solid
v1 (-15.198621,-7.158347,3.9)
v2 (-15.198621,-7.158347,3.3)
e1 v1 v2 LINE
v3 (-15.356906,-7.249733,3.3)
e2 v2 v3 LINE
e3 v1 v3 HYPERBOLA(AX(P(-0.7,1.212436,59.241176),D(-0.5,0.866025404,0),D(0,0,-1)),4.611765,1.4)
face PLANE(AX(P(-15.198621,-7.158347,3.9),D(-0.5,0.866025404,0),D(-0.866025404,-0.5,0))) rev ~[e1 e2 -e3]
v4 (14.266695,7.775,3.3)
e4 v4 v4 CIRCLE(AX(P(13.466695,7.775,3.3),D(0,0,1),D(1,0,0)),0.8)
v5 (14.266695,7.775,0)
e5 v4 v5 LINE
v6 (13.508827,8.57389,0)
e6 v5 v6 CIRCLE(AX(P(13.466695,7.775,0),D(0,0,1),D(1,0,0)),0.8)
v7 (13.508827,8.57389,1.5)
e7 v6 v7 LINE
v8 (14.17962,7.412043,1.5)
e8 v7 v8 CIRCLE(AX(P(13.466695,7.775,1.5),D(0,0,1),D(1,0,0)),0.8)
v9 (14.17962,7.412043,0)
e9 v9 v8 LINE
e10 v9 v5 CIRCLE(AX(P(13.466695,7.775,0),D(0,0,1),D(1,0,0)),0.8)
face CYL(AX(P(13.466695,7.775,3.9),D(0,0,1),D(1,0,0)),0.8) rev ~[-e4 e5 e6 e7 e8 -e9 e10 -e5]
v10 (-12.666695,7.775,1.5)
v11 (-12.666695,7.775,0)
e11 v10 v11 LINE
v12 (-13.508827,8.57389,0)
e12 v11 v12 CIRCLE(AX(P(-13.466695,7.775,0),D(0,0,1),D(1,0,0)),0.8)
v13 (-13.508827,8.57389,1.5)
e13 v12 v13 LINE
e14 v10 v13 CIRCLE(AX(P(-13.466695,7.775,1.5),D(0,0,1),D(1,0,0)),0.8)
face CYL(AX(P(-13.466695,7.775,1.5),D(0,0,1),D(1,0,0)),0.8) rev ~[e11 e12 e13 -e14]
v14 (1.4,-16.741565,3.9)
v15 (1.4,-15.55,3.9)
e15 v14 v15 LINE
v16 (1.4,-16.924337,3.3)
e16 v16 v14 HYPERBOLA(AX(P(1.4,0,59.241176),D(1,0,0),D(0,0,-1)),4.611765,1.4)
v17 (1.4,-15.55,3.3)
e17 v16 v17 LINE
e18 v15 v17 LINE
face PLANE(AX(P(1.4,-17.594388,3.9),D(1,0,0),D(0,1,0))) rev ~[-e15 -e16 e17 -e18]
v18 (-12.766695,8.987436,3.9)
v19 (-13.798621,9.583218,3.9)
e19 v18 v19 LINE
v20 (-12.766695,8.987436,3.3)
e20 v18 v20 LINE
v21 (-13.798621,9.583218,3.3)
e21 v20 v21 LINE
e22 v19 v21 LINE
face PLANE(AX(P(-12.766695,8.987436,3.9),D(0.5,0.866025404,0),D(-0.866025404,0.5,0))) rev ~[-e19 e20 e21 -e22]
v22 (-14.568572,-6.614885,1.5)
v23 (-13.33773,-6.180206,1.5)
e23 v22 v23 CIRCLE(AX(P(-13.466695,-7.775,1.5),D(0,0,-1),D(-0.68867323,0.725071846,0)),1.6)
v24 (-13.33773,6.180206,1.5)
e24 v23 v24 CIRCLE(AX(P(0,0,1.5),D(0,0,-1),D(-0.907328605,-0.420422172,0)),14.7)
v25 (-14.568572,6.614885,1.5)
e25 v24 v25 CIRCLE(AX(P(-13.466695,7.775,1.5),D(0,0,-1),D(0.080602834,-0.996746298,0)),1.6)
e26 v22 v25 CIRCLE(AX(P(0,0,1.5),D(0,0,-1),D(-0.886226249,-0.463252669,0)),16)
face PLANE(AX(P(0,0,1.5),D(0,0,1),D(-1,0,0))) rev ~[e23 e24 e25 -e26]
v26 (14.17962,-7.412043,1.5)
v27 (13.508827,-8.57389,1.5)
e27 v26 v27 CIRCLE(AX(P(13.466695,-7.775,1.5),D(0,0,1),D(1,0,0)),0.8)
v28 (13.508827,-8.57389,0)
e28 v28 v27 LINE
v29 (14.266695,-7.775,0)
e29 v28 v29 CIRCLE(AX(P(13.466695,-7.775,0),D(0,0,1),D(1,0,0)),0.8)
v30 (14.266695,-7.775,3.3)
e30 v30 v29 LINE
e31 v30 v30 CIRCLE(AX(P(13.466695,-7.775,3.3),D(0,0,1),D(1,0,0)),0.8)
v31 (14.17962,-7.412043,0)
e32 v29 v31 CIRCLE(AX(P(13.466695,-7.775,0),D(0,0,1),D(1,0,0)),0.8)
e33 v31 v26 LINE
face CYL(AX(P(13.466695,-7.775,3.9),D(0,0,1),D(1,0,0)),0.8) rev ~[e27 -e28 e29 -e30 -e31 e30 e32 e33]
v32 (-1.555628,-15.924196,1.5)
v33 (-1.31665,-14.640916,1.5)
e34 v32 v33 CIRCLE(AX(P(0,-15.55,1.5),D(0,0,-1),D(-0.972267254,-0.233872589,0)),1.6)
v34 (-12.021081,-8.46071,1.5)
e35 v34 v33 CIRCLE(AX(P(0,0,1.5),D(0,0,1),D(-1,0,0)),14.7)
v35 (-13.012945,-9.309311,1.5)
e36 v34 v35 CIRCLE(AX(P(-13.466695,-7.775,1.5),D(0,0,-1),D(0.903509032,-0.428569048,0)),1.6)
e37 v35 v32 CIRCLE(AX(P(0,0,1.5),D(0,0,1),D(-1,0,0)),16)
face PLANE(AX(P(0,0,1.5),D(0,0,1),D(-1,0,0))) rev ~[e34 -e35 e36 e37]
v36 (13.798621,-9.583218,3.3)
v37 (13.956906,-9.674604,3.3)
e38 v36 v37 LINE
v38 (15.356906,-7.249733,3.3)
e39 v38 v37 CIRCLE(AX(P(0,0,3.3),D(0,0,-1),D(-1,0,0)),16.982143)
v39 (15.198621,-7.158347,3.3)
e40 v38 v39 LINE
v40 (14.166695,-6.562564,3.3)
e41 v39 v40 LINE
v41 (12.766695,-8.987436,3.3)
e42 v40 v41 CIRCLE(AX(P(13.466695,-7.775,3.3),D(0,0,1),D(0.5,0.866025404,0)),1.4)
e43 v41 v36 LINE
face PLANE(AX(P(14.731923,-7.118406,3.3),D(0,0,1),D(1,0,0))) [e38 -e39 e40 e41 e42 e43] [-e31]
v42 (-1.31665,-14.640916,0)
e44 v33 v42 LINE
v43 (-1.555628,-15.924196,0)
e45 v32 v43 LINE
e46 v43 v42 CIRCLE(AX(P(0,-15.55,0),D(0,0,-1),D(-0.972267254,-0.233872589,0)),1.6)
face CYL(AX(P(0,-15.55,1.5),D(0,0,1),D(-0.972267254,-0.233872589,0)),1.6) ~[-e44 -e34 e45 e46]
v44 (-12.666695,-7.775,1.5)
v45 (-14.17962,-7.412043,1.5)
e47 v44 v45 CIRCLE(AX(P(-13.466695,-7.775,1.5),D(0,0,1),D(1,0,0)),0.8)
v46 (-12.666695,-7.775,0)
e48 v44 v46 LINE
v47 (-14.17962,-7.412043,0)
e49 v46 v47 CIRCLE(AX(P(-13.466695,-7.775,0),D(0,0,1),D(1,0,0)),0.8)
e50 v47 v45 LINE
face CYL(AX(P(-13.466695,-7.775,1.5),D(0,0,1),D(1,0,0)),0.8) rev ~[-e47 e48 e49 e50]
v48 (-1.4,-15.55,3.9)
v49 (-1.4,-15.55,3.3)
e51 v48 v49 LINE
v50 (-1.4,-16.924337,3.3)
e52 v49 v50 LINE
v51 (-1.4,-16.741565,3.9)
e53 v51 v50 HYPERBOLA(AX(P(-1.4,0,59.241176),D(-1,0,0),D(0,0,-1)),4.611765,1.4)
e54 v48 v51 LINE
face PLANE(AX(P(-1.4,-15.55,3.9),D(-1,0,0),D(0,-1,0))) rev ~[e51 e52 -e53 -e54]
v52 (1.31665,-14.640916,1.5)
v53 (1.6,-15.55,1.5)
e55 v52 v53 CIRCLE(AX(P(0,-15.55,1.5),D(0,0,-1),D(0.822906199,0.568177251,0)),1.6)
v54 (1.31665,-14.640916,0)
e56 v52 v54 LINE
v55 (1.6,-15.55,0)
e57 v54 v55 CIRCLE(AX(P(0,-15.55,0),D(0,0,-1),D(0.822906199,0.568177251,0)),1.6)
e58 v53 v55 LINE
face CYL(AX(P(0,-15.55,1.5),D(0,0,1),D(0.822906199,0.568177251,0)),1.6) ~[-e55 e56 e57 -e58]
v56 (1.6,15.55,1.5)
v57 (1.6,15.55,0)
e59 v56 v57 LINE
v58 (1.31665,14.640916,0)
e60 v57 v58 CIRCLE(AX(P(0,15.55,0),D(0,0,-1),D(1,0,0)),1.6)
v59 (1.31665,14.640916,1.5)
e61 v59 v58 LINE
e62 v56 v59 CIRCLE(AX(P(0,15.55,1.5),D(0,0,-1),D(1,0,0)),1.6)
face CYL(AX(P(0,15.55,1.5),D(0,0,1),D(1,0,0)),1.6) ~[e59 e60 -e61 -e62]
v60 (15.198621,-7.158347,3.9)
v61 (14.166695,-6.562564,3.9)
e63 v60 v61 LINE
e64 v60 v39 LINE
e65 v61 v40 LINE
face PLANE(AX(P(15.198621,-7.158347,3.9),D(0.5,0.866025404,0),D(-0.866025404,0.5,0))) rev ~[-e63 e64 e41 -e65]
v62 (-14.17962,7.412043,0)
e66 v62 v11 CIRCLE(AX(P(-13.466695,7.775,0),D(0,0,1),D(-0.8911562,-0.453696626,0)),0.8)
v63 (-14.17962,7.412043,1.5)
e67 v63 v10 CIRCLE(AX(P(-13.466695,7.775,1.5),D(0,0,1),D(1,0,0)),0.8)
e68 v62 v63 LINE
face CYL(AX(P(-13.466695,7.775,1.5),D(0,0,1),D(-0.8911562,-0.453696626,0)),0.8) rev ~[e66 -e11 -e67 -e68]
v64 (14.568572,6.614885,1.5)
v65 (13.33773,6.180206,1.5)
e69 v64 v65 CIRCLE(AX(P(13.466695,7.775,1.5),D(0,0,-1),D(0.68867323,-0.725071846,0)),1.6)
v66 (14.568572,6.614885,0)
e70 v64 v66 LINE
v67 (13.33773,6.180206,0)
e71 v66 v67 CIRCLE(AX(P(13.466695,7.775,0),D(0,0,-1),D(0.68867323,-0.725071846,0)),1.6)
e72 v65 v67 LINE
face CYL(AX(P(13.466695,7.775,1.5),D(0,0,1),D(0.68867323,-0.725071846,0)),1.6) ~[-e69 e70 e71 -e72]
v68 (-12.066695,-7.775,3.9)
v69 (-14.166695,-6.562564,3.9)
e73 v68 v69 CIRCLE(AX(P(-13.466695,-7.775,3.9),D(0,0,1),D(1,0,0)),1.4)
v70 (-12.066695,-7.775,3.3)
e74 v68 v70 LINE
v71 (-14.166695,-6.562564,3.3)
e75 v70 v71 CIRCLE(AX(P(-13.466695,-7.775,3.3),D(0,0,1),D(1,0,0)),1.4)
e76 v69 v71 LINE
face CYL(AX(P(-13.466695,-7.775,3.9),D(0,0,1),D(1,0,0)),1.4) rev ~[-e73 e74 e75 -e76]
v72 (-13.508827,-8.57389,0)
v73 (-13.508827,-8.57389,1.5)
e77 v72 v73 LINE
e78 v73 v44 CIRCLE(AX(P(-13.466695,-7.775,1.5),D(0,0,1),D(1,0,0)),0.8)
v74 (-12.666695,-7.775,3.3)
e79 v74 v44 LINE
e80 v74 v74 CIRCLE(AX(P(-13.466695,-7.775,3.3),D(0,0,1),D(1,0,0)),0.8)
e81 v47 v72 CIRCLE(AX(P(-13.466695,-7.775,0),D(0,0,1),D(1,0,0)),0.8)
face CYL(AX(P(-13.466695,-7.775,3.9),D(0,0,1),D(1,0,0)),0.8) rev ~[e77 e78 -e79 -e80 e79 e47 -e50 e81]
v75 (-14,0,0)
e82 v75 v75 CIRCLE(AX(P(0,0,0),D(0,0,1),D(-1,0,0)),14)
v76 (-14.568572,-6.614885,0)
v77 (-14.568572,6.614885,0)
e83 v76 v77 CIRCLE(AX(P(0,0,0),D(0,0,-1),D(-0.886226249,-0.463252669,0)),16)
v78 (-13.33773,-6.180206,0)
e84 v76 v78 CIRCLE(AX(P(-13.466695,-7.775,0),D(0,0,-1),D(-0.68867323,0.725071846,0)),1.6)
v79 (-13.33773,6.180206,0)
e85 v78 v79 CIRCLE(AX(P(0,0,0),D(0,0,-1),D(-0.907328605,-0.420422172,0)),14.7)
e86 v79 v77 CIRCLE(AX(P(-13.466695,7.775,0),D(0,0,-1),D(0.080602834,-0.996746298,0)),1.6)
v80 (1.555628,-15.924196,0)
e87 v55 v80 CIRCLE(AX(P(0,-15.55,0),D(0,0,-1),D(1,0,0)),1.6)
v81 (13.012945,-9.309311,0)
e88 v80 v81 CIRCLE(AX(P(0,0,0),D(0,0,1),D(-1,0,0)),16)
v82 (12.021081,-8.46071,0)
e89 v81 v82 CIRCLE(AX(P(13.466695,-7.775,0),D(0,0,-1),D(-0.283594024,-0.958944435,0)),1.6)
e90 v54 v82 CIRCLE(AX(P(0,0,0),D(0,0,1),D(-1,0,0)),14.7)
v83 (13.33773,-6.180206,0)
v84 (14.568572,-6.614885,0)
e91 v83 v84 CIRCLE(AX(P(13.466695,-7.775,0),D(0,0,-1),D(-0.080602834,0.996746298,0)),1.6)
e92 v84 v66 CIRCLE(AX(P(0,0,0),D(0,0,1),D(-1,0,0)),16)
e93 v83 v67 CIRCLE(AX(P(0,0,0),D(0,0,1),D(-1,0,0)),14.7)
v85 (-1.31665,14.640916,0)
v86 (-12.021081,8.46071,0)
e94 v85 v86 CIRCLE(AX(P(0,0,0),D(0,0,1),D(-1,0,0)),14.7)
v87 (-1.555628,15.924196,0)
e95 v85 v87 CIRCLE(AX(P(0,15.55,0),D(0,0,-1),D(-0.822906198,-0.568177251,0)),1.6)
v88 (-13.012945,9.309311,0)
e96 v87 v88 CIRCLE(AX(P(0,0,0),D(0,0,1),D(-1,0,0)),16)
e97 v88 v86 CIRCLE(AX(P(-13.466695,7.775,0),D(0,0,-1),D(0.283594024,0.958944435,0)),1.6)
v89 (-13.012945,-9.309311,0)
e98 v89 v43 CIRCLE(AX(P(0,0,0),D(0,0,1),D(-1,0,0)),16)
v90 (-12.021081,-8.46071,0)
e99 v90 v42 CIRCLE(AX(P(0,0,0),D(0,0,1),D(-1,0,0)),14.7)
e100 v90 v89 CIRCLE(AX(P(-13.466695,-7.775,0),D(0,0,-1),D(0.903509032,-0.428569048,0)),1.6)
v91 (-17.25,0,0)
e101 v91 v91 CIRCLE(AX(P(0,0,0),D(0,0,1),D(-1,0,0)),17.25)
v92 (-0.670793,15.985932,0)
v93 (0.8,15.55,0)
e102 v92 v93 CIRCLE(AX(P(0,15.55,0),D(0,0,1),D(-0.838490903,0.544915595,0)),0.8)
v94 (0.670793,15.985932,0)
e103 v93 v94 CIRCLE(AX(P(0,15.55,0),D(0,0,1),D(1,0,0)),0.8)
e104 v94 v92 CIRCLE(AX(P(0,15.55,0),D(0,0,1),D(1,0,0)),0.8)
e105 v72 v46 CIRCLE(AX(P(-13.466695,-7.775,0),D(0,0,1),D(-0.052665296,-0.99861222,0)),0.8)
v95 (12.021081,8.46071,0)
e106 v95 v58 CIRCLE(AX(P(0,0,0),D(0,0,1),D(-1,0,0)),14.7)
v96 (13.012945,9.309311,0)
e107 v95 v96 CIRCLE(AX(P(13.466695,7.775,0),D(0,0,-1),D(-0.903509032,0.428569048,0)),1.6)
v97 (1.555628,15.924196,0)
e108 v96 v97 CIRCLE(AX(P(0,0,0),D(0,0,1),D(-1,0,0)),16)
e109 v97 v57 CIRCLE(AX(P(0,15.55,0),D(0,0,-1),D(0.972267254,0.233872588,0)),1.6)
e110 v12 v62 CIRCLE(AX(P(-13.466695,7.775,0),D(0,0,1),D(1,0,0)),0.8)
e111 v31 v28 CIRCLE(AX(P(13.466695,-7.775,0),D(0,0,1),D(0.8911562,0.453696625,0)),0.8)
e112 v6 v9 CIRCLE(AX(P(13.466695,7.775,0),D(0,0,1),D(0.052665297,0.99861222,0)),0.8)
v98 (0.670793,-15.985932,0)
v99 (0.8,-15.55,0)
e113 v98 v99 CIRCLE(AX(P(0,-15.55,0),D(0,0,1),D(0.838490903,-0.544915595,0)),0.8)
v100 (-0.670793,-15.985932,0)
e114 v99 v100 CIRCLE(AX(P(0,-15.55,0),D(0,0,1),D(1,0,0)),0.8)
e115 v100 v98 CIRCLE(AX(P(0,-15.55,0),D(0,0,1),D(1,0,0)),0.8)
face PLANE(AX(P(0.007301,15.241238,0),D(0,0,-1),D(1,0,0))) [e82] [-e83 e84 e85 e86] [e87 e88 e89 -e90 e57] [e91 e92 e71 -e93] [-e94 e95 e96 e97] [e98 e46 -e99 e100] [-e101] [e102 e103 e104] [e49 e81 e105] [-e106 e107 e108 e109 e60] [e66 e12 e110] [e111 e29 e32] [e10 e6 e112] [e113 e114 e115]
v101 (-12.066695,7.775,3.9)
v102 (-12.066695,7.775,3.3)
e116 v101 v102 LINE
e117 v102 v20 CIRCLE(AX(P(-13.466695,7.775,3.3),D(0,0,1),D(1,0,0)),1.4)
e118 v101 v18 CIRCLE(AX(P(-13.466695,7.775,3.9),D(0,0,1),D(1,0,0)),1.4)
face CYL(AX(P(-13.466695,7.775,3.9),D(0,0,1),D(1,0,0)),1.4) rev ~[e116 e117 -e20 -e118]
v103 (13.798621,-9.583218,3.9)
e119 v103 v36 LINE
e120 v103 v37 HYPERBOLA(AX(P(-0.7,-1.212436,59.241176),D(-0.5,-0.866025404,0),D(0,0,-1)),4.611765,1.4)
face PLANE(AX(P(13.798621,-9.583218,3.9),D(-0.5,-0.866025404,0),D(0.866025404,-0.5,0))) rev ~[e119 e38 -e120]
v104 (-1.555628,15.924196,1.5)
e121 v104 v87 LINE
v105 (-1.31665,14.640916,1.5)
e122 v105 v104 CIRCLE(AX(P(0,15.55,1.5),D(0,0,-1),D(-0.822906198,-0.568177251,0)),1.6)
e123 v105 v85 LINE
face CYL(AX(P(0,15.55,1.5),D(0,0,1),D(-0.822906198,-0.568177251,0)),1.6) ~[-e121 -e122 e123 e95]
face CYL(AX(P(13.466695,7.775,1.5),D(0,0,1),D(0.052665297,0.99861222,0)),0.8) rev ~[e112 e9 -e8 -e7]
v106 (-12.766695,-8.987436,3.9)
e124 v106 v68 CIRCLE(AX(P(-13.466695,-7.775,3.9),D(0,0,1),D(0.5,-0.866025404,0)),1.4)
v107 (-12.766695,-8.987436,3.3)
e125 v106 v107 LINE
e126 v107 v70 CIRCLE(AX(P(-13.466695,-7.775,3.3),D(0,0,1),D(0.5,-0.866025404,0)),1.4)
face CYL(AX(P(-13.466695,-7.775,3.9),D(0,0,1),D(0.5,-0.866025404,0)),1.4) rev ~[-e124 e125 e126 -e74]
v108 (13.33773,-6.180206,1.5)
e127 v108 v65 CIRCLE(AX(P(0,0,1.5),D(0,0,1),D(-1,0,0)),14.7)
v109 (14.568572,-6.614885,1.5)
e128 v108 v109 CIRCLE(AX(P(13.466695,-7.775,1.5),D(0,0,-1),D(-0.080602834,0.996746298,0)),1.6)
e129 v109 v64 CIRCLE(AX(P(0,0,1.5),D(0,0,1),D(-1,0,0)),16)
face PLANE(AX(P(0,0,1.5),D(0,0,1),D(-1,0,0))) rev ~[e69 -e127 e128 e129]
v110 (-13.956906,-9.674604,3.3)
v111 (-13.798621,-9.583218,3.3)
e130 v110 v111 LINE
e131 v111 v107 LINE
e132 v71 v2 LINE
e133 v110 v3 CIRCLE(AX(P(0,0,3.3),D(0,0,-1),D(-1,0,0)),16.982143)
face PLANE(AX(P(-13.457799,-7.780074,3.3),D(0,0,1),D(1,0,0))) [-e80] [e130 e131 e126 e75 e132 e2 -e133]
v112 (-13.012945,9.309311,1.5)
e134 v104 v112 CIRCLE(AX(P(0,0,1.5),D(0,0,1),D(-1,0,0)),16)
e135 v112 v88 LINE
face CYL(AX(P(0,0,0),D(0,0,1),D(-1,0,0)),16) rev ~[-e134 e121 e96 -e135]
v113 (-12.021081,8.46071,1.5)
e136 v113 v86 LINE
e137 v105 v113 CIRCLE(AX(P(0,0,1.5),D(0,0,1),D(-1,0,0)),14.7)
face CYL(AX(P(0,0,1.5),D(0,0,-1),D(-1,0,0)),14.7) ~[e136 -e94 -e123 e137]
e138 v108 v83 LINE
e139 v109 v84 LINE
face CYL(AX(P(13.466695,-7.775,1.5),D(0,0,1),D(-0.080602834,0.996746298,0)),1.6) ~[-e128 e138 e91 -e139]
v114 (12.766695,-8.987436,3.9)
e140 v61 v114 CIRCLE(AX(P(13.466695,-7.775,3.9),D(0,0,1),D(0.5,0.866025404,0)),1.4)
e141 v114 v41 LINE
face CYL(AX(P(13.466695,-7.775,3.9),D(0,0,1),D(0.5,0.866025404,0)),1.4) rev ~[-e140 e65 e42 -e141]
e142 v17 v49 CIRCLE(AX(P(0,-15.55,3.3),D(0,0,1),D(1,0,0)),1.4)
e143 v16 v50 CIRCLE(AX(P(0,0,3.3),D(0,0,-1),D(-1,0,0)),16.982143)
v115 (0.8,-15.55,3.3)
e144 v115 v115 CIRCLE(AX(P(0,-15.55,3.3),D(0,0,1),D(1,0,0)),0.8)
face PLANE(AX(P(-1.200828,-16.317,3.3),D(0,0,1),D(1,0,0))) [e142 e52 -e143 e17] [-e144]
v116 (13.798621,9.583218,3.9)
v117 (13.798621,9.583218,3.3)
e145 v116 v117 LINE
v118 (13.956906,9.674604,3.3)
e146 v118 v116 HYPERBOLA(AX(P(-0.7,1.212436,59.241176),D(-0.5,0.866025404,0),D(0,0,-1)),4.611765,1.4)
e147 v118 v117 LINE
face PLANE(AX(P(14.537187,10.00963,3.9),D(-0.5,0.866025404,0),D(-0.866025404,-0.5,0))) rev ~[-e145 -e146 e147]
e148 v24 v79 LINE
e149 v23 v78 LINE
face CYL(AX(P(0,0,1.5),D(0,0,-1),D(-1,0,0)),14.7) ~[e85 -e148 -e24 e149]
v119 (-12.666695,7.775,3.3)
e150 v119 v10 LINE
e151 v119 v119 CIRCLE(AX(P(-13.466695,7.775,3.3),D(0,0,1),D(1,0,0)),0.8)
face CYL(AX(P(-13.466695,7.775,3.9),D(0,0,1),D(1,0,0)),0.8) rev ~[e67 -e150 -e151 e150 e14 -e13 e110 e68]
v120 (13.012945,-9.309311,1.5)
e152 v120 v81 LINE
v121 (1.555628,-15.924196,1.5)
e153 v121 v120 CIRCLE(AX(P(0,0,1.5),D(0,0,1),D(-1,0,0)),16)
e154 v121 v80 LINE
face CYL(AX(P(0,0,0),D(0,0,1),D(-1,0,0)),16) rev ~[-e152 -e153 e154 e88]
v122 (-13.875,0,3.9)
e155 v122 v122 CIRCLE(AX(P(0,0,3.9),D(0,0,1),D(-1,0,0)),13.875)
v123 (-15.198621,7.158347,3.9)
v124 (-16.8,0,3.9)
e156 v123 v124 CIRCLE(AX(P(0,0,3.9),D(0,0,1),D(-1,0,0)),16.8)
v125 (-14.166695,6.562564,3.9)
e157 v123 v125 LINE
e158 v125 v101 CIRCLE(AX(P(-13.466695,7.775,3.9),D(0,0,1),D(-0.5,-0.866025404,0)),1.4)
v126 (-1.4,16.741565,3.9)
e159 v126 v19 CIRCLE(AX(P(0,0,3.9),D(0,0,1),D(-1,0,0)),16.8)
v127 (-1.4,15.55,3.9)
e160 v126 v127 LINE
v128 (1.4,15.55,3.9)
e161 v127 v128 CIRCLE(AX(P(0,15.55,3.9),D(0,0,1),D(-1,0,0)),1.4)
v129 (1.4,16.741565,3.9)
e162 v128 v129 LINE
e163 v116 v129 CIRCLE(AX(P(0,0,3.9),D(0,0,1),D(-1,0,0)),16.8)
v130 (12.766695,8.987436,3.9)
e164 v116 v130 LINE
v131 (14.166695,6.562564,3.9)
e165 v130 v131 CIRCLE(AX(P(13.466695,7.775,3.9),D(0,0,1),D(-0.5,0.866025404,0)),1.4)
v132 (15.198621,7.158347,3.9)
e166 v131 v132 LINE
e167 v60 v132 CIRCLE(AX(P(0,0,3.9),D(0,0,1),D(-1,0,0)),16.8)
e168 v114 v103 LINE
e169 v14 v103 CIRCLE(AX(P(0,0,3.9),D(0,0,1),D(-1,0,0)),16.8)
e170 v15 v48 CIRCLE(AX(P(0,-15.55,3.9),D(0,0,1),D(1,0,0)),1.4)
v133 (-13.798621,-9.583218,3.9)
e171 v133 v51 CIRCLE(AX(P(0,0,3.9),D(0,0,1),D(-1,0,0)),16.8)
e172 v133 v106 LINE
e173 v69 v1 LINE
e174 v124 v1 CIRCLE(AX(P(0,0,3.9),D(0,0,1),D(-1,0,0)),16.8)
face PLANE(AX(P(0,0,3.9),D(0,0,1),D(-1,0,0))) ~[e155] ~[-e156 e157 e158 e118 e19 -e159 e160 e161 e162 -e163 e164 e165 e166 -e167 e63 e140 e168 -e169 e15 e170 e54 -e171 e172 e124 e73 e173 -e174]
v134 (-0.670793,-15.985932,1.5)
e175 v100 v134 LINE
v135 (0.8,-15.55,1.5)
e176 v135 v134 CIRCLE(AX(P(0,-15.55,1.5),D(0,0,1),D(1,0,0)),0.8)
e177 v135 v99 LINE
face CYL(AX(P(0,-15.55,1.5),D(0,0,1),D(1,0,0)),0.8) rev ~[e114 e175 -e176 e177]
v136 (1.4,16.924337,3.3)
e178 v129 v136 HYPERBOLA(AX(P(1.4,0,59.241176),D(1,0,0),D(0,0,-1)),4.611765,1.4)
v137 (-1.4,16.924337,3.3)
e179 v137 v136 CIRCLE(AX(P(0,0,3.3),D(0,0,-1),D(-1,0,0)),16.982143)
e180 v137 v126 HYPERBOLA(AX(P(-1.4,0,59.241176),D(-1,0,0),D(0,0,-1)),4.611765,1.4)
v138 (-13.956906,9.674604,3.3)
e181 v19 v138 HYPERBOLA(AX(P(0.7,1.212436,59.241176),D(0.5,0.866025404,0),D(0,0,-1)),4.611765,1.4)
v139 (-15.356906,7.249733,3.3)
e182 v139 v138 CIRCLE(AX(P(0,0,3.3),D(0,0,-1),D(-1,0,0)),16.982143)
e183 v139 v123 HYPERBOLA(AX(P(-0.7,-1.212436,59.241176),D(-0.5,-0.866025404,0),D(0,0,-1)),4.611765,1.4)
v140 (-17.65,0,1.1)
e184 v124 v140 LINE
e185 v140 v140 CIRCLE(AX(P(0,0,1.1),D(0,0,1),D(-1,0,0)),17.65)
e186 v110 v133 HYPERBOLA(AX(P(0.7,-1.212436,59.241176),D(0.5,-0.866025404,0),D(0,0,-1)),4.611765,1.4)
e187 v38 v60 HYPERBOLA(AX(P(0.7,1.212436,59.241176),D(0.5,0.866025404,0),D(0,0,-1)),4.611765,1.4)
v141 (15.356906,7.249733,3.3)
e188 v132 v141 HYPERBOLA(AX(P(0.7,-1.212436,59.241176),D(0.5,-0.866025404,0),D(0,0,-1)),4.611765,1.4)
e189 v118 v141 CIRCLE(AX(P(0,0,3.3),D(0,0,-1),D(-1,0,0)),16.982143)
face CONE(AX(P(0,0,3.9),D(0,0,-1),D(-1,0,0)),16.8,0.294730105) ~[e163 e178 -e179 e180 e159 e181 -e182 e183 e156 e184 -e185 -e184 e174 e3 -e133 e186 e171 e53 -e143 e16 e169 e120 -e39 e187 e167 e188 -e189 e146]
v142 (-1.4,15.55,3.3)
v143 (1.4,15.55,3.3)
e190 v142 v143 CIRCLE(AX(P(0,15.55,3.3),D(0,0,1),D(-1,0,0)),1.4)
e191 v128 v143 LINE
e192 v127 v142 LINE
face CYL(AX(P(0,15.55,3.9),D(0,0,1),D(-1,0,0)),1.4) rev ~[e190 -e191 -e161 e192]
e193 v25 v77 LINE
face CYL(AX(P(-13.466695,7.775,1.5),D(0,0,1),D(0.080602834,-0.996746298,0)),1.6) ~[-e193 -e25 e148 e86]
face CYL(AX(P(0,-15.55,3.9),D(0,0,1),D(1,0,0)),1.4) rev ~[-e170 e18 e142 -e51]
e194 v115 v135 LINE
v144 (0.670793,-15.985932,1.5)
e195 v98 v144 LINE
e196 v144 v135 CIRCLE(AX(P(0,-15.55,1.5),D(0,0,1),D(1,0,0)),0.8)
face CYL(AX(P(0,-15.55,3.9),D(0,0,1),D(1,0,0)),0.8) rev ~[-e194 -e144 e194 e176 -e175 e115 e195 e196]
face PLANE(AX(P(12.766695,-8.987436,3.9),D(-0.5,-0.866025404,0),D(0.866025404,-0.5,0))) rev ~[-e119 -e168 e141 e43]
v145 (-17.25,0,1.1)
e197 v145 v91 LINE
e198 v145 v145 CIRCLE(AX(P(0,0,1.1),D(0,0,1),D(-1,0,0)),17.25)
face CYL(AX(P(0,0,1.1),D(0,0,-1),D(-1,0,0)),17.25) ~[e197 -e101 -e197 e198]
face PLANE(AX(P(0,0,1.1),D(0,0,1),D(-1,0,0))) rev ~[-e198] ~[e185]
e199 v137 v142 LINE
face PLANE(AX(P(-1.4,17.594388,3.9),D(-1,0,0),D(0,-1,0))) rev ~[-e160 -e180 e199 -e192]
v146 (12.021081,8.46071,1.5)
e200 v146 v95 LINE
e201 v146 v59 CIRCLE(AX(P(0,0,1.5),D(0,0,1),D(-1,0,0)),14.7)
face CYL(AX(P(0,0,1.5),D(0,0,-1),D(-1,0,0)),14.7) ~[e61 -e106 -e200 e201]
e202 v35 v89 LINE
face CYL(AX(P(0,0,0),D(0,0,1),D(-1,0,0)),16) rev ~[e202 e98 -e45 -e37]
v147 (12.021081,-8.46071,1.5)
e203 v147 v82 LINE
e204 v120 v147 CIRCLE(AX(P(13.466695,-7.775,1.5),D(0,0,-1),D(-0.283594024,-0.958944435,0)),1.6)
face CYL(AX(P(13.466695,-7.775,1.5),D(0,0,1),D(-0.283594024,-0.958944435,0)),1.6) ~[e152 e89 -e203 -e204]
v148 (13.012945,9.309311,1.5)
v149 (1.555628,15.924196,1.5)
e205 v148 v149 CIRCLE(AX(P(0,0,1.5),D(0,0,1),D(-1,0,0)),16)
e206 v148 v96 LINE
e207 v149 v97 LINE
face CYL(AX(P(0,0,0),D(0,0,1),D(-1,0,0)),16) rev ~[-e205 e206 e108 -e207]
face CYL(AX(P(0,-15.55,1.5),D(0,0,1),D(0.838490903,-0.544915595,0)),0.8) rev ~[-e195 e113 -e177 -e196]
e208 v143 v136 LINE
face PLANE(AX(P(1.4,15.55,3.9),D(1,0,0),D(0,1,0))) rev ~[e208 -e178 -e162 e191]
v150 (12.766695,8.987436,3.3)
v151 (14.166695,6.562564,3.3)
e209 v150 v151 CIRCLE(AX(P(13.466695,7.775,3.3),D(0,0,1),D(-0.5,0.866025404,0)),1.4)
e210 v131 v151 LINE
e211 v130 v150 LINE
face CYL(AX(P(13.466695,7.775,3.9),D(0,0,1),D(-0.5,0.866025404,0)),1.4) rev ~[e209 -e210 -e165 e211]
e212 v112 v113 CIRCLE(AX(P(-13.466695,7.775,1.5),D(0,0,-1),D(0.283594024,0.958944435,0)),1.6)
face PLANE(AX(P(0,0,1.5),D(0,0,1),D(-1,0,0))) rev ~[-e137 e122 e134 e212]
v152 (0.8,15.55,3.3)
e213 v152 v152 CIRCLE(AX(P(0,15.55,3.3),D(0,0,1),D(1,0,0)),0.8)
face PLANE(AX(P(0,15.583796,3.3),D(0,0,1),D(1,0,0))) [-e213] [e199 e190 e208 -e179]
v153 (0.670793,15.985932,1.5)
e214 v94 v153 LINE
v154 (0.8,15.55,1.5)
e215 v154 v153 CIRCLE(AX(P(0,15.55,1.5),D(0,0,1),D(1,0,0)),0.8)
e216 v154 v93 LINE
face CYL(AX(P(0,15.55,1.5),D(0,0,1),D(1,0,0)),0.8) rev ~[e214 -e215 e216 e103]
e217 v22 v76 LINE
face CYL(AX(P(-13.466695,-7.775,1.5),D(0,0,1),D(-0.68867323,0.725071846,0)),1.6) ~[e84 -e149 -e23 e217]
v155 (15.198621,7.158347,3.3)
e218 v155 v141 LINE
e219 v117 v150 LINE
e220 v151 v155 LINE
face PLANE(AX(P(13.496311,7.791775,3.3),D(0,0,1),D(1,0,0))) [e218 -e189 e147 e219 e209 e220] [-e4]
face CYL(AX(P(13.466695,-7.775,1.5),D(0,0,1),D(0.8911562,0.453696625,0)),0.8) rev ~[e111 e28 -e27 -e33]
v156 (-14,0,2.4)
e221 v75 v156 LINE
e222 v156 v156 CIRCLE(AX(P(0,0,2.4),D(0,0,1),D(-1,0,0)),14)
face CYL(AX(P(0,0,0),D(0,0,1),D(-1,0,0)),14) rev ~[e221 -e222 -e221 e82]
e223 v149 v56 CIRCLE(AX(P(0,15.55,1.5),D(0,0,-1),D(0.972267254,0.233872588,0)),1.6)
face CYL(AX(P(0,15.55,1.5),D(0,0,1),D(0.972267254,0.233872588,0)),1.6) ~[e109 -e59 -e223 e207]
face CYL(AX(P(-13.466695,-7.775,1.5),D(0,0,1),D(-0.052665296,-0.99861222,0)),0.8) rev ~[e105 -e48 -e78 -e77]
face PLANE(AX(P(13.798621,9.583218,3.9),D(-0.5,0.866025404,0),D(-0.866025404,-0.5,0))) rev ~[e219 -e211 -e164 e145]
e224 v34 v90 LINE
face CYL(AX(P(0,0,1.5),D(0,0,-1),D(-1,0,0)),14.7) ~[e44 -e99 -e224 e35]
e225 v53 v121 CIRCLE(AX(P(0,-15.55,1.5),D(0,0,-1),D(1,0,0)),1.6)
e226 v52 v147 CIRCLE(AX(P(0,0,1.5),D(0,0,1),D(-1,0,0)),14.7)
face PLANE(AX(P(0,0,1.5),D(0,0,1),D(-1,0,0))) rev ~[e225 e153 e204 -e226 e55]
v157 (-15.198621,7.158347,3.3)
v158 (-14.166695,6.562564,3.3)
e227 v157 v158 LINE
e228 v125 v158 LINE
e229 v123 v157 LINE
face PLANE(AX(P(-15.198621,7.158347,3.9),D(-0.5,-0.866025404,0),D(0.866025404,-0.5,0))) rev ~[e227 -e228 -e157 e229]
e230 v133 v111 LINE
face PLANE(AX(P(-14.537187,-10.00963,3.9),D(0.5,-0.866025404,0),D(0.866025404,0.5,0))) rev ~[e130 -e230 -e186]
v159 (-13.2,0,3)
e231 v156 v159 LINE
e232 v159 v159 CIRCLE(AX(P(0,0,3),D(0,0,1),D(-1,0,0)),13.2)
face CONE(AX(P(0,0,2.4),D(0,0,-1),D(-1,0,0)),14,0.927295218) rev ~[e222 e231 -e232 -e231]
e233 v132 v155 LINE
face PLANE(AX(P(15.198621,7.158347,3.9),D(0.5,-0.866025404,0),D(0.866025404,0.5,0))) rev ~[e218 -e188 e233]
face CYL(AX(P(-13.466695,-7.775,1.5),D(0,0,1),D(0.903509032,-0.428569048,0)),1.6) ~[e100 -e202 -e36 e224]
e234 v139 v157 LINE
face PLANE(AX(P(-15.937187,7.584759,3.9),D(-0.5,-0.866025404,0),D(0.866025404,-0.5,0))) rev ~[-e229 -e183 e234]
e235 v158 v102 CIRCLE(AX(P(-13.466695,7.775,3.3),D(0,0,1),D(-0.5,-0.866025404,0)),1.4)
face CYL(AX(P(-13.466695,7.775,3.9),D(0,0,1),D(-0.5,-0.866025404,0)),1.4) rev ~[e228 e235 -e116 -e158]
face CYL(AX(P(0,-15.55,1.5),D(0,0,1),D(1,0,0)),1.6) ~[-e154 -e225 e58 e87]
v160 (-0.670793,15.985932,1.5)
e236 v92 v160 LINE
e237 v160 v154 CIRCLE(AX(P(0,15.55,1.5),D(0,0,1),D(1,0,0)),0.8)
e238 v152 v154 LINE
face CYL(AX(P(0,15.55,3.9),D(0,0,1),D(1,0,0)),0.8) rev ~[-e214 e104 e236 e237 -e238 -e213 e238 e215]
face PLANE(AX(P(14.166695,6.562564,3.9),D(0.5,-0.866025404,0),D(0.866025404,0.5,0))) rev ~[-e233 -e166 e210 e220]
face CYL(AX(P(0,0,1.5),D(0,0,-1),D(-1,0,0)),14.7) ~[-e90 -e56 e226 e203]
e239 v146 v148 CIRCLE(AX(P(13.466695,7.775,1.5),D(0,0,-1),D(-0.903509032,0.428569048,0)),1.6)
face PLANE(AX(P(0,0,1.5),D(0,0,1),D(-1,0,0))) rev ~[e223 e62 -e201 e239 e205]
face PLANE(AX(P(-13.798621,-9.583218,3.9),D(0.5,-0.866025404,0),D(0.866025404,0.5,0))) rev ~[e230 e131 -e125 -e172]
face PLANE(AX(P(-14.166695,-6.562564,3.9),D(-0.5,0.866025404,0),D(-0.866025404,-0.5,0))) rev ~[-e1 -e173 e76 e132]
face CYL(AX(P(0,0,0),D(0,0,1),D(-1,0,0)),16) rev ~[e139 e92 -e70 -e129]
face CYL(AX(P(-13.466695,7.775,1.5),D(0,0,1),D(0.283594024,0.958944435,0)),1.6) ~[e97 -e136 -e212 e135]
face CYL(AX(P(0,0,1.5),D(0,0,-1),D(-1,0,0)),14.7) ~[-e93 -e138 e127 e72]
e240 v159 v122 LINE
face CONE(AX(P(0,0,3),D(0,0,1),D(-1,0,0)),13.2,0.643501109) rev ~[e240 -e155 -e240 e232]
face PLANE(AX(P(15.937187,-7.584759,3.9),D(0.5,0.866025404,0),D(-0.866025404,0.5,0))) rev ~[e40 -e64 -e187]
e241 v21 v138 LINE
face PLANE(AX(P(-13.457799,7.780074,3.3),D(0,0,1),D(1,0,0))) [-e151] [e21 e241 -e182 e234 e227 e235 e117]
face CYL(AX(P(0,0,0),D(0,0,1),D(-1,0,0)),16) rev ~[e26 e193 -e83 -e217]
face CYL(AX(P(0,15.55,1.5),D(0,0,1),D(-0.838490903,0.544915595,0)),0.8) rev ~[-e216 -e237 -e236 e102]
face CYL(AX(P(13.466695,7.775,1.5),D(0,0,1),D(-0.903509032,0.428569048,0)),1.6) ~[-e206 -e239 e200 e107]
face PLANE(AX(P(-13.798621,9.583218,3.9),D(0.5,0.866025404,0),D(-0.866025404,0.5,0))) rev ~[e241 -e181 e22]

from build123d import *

# Parameters (mm, degrees)
F2_R     = 0.8
F3_DEPTH = 3.901
F4_DEPTH = 0.6
F6_DEPTH = 1.5


with BuildPart() as f1:
    # F0 (on Front) → F1 (revolve)
    with BuildSketch(Plane.XZ):
        Polygon((-14.7, 0), (-14, 0), (-14, 2.4), (-13.2, 3), (-13.875, 3.9), (-16.8, 3.9), (-17.65, 1.1), (-17.25, 1.1), (-17.25, 0), (-16, 0), (-16, 1.5), (-14.7, 1.5), align=None)
    revolve(axis=Axis((0, 0, 5.7374605552), (0, 0, 1)))

    # F2 (on face) → F3 (cut, through all)
    with BuildSketch(Plane.XY.offset(3.9)):
        with Locations((0, 15.55)):
            Circle(F2_R)
        with Locations((13.4666950288, 7.775)):
            Circle(F2_R)
        with Locations((13.4666950288, -7.775)):
            Circle(F2_R)
        with Locations((-13.4666950288, 7.775)):
            Circle(F2_R)
        with Locations((0, -15.55)):
            Circle(F2_R)
        with Locations((-13.4666950288, -7.775)):
            Circle(F2_R)
    extrude(amount=-F3_DEPTH, mode=Mode.SUBTRACT)

    # F2 (on face) → F4 (cut)
    with BuildSketch(Plane.XY.offset(3.9)):
        with BuildLine():
            ThreePointArc((-0.655202269, 16.7872186495), (-1.1994338616, 16.2720515298), (-1.4, 15.55))
            ThreePointArc((-1.4, 15.55), (0, 14.15), (1.4, 15.55))
            ThreePointArc((1.4, 15.55), (1.1994338616, 16.2720515298), (0.655202269, 16.7872186495))
            ThreePointArc((0.655202269, 16.7872186495), (0, 16.8), (-0.655202269, 16.7872186495))
        make_face()
        with Locations((0, 15.55)):
            Circle(F2_R, mode=Mode.SUBTRACT)
        with BuildLine():
            ThreePointArc((0.655202269, 16.7872186495), (1.1994338616, 16.2720515298), (1.4, 15.55))
            Line((1.4, 15.55), (1.4, 16.7415650403))
            ThreePointArc((1.4, 16.7415650403), (1.0278546369, 16.7685275098), (0.655202269, 16.7872186495))
        make_face()
        with BuildLine():
            ThreePointArc((-1.4, 16.7415650403), (-1.0278546369, 16.7685275098), (-0.655202269, 16.7872186495))
            ThreePointArc((-0.655202269, 16.7872186495), (0, 16.95), (0.655202269, 16.7872186495))
            ThreePointArc((0.655202269, 16.7872186495), (1.0278546369, 16.7685275098), (1.4, 16.7415650403))
            Line((1.4, 16.7415650403), (1.4, 17.5943883099))
            ThreePointArc((1.4, 17.5943883099), (0, 17.65), (-1.4, 17.5943883099))
            Line((-1.4, 17.5943883099), (-1.4, 16.7415650403))
        make_face()
        with BuildLine():
            Line((-1.4, 16.7415650403), (-1.4, 15.55))
            ThreePointArc((-1.4, 15.55), (-1.1994338616, 16.2720515298), (-0.655202269, 16.7872186495))
            ThreePointArc((-0.655202269, 16.7872186495), (-1.0278546369, 16.7685275098), (-1.4, 16.7415650403))
        make_face()
        with BuildLine():
            ThreePointArc((14.2105566749, 8.9610311343), (13.4922930657, 9.1747659592), (12.7666950288, 8.9874355653))
            ThreePointArc((12.7666950288, 8.9874355653), (12.2542594635, 7.075), (14.1666950288, 6.5625644347))
            ThreePointArc((14.1666950288, 6.5625644347), (14.6791305941, 7.075), (14.8666950288, 7.775))
            ThreePointArc((14.8666950288, 7.775), (14.866460988, 7.8005980369), (14.8657589439, 7.8261875152))
            ThreePointArc((14.8657589439, 7.8261875152), (14.5492267836, 8.4), (14.2105566749, 8.9610311343))
        make_face()
        with Locations((13.4666950288, 7.775)):
            Circle(F2_R, mode=Mode.SUBTRACT)
        with BuildLine():
            ThreePointArc((14.2105566749, 8.9610311343), (14.008043489, 9.2744119818), (13.798620624, 9.5832180855))
            Line((13.798620624, 9.5832180855), (12.7666950288, 8.9874355653))
            ThreePointArc((12.7666950288, 8.9874355653), (13.4922930657, 9.1747659592), (14.2105566749, 8.9610311343))
        make_face()
        with BuildLine():
            ThreePointArc((14.8666950288, 7.775), (14.6791305941, 7.075), (14.1666950288, 6.5625644347))
            Line((14.1666950288, 6.5625644347), (15.198620624, 7.1583469549))
            ThreePointArc((15.198620624, 7.1583469549), (15.035898126, 7.4941155279), (14.8657589439, 7.8261875152))
            ThreePointArc((14.8657589439, 7.8261875152), (14.866460988, 7.8005980369), (14.8666950288, 7.775))
        make_face()
        with BuildLine():
            Line((14.5371872404, 10.0096297203), (13.798620624, 9.5832180855))
            ThreePointArc((13.798620624, 9.5832180855), (14.008043489, 9.2744119818), (14.2105566749, 8.9610311343))
            ThreePointArc((14.2105566749, 8.9610311343), (14.6791305941, 8.475), (14.8657589439, 7.8261875152))
            ThreePointArc((14.8657589439, 7.8261875152), (15.035898126, 7.4941155279), (15.198620624, 7.1583469549))
            Line((15.198620624, 7.1583469549), (15.9371872404, 7.5847585897))
            ThreePointArc((15.9371872404, 7.5847585897), (15.2853483768, 8.825), (14.5371872404, 10.0096297203))
        make_face()
        with BuildLine():
            ThreePointArc((14.8657589439, -7.8261875152), (15.035898126, -7.4941155279), (15.198620624, -7.1583469549))
            Line((15.198620624, -7.1583469549), (14.1666950288, -6.5625644347))
            ThreePointArc((14.1666950288, -6.5625644347), (14.6791305941, -7.075), (14.8666950288, -7.775))
            ThreePointArc((14.8666950288, -7.775), (14.866460988, -7.8005980369), (14.8657589439, -7.8261875152))
        make_face()
        with BuildLine():
            ThreePointArc((14.8666950288, -7.775), (14.6791305941, -7.075), (14.1666950288, -6.5625644347))
            ThreePointArc((14.1666950288, -6.5625644347), (12.2542594635, -7.075), (12.7666950288, -8.9874355653))
            ThreePointArc((12.7666950288, -8.9874355653), (13.4922930657, -9.1747659592), (14.2105566749, -8.9610311343))
            ThreePointArc((14.2105566749, -8.9610311343), (14.5492267836, -8.4), (14.8657589439, -7.8261875152))
            ThreePointArc((14.8657589439, -7.8261875152), (14.866460988, -7.8005980369), (14.8666950288, -7.775))
        make_face()
        with Locations((13.4666950288, -7.775)):
            Circle(F2_R, mode=Mode.SUBTRACT)
        with BuildLine():
            Line((12.7666950288, -8.9874355653), (13.798620624, -9.5832180855))
            ThreePointArc((13.798620624, -9.5832180855), (14.008043489, -9.2744119818), (14.2105566749, -8.9610311343))
            ThreePointArc((14.2105566749, -8.9610311343), (13.4922930657, -9.1747659592), (12.7666950288, -8.9874355653))
        make_face()
        with BuildLine():
            ThreePointArc((14.2105566749, -8.9610311343), (14.6791305941, -8.475), (14.8657589439, -7.8261875152))
            ThreePointArc((14.8657589439, -7.8261875152), (14.5492267836, -8.4), (14.2105566749, -8.9610311343))
        make_face()
        with BuildLine():
            ThreePointArc((14.5371872404, -10.0096297203), (15.2853483768, -8.825), (15.9371872404, -7.5847585897))
            Line((15.9371872404, -7.5847585897), (15.198620624, -7.1583469549))
            ThreePointArc((15.198620624, -7.1583469549), (15.035898126, -7.4941155279), (14.8657589439, -7.8261875152))
            ThreePointArc((14.8657589439, -7.8261875152), (14.6791305941, -8.475), (14.2105566749, -8.9610311343))
            ThreePointArc((14.2105566749, -8.9610311343), (14.008043489, -9.2744119818), (13.798620624, -9.5832180855))
            Line((13.798620624, -9.5832180855), (14.5371872404, -10.0096297203))
        make_face()
        with BuildLine():
            ThreePointArc((14.8657589439, 7.8261875152), (14.6791305941, 8.475), (14.2105566749, 8.9610311343))
            ThreePointArc((14.2105566749, 8.9610311343), (14.5492267836, 8.4), (14.8657589439, 7.8261875152))
        make_face()
        with BuildLine():
            ThreePointArc((0.655202269, 16.7872186495), (0, 16.95), (-0.655202269, 16.7872186495))
            ThreePointArc((-0.655202269, 16.7872186495), (0, 16.8), (0.655202269, 16.7872186495))
        make_face()
        with BuildLine():
            ThreePointArc((-12.0666950288, 7.775), (-12.2542594635, 8.475), (-12.7666950288, 8.9874355653))
            ThreePointArc((-12.7666950288, 8.9874355653), (-13.4922930657, 9.1747659592), (-14.2105566749, 8.9610311343))
            ThreePointArc((-14.2105566749, 8.9610311343), (-14.5492267836, 8.4), (-14.8657589439, 7.8261875152))
            ThreePointArc((-14.8657589439, 7.8261875152), (-14.6917269273, 7.0972855706), (-14.1666950288, 6.5625644347))
            ThreePointArc((-14.1666950288, 6.5625644347), (-12.7666950288, 6.5625644347), (-12.0666950288, 7.775))
        make_face()
        with Locations((-13.4666950288, 7.775)):
            Circle(F2_R, mode=Mode.SUBTRACT)
        with BuildLine():
            ThreePointArc((-14.2105566749, 8.9610311343), (-14.008043489, 9.2744119818), (-13.798620624, 9.5832180855))
            Line((-13.798620624, 9.5832180855), (-14.5371872404, 10.0096297203))
            ThreePointArc((-14.5371872404, 10.0096297203), (-15.2853483768, 8.825), (-15.9371872404, 7.5847585897))
            Line((-15.9371872404, 7.5847585897), (-15.198620624, 7.1583469549))
            ThreePointArc((-15.198620624, 7.1583469549), (-15.035898126, 7.4941155279), (-14.8657589439, 7.8261875152))
            ThreePointArc((-14.8657589439, 7.8261875152), (-14.6791305941, 8.475), (-14.2105566749, 8.9610311343))
        make_face()
        with BuildLine():
            Line((-12.7666950288, 8.9874355653), (-13.798620624, 9.5832180855))
            ThreePointArc((-13.798620624, 9.5832180855), (-14.008043489, 9.2744119818), (-14.2105566749, 8.9610311343))
            ThreePointArc((-14.2105566749, 8.9610311343), (-13.4922930657, 9.1747659592), (-12.7666950288, 8.9874355653))
        make_face()
        with BuildLine():
            ThreePointArc((-14.1666950288, 6.5625644347), (-14.6917269273, 7.0972855706), (-14.8657589439, 7.8261875152))
            ThreePointArc((-14.8657589439, 7.8261875152), (-15.035898126, 7.4941155279), (-15.198620624, 7.1583469549))
            Line((-15.198620624, 7.1583469549), (-14.1666950288, 6.5625644347))
        make_face()
        with BuildLine():
            ThreePointArc((-12.0666950288, -7.775), (-12.7666950288, -6.5625644347), (-14.1666950288, -6.5625644347))
            ThreePointArc((-14.1666950288, -6.5625644347), (-14.6917269273, -7.0972855706), (-14.8657589439, -7.8261875152))
            ThreePointArc((-14.8657589439, -7.8261875152), (-14.5492267836, -8.4), (-14.2105566749, -8.9610311343))
            ThreePointArc((-14.2105566749, -8.9610311343), (-13.4922930657, -9.1747659592), (-12.7666950288, -8.9874355653))
            ThreePointArc((-12.7666950288, -8.9874355653), (-12.2542594635, -8.475), (-12.0666950288, -7.775))
        make_face()
        with Locations((-13.4666950288, -7.775)):
            Circle(F2_R, mode=Mode.SUBTRACT)
        with BuildLine():
            Line((-14.1666950288, -6.5625644347), (-15.198620624, -7.1583469549))
            ThreePointArc((-15.198620624, -7.1583469549), (-15.035898126, -7.4941155279), (-14.8657589439, -7.8261875152))
            ThreePointArc((-14.8657589439, -7.8261875152), (-14.6917269273, -7.0972855706), (-14.1666950288, -6.5625644347))
        make_face()
        with BuildLine():
            Line((-15.198620624, -7.1583469549), (-15.9371872404, -7.5847585897))
            ThreePointArc((-15.9371872404, -7.5847585897), (-15.2853483768, -8.825), (-14.5371872404, -10.0096297203))
            Line((-14.5371872404, -10.0096297203), (-13.798620624, -9.5832180855))
            ThreePointArc((-13.798620624, -9.5832180855), (-14.008043489, -9.2744119818), (-14.2105566749, -8.9610311343))
            ThreePointArc((-14.2105566749, -8.9610311343), (-14.6791305941, -8.475), (-14.8657589439, -7.8261875152))
            ThreePointArc((-14.8657589439, -7.8261875152), (-15.035898126, -7.4941155279), (-15.198620624, -7.1583469549))
        make_face()
        with BuildLine():
            ThreePointArc((-14.2105566749, -8.9610311343), (-14.5492267836, -8.4), (-14.8657589439, -7.8261875152))
            ThreePointArc((-14.8657589439, -7.8261875152), (-14.6791305941, -8.475), (-14.2105566749, -8.9610311343))
        make_face()
        with BuildLine():
            ThreePointArc((-14.2105566749, -8.9610311343), (-14.008043489, -9.2744119818), (-13.798620624, -9.5832180855))
            Line((-13.798620624, -9.5832180855), (-12.7666950288, -8.9874355653))
            ThreePointArc((-12.7666950288, -8.9874355653), (-13.4922930657, -9.1747659592), (-14.2105566749, -8.9610311343))
        make_face()
        with BuildLine():
            Line((-1.4, -15.55), (-1.4, -16.7415650403))
            ThreePointArc((-1.4, -16.7415650403), (-1.0278546369, -16.7685275098), (-0.655202269, -16.7872186495))
            ThreePointArc((-0.655202269, -16.7872186495), (-1.1994338616, -16.2720515298), (-1.4, -15.55))
        make_face()
        with BuildLine():
            ThreePointArc((0.655202269, -16.7872186495), (1.0278546369, -16.7685275098), (1.4, -16.7415650403))
            Line((1.4, -16.7415650403), (1.4, -15.55))
            ThreePointArc((1.4, -15.55), (1.1994338616, -16.2720515298), (0.655202269, -16.7872186495))
        make_face()
        with BuildLine():
            Line((-1.4, -16.7415650403), (-1.4, -17.5943883099))
            ThreePointArc((-1.4, -17.5943883099), (0, -17.65), (1.4, -17.5943883099))
            Line((1.4, -17.5943883099), (1.4, -16.7415650403))
            ThreePointArc((1.4, -16.7415650403), (1.0278546369, -16.7685275098), (0.655202269, -16.7872186495))
            ThreePointArc((0.655202269, -16.7872186495), (0, -16.95), (-0.655202269, -16.7872186495))
            ThreePointArc((-0.655202269, -16.7872186495), (-1.0278546369, -16.7685275098), (-1.4, -16.7415650403))
        make_face()
        with BuildLine():
            ThreePointArc((0.655202269, -16.7872186495), (0, -16.8), (-0.655202269, -16.7872186495))
            ThreePointArc((-0.655202269, -16.7872186495), (0, -16.95), (0.655202269, -16.7872186495))
        make_face()
        with BuildLine():
            ThreePointArc((1.4, -15.55), (0, -14.15), (-1.4, -15.55))
            ThreePointArc((-1.4, -15.55), (-1.1994338616, -16.2720515298), (-0.655202269, -16.7872186495))
            ThreePointArc((-0.655202269, -16.7872186495), (0, -16.8), (0.655202269, -16.7872186495))
            ThreePointArc((0.655202269, -16.7872186495), (1.1994338616, -16.2720515298), (1.4, -15.55))
        make_face()
        with Locations((0, -15.55)):
            Circle(F2_R, mode=Mode.SUBTRACT)
        with BuildLine():
            ThreePointArc((-14.8657589439, 7.8261875152), (-14.5492267836, 8.4), (-14.2105566749, 8.9610311343))
            ThreePointArc((-14.2105566749, 8.9610311343), (-14.6791305941, 8.475), (-14.8657589439, 7.8261875152))
        make_face()
    extrude(amount=-F4_DEPTH, mode=Mode.SUBTRACT)

    # F5 (on face) → F6 (join, through all)
    with BuildSketch(Plane(origin=(0, 0, 1.5), x_dir=(1, 0, 0), z_dir=(0, 0, -1))):
        with BuildLine():
            ThreePointArc((1.5556276057, -15.9241961415), (1.5888681772, -15.7384089048), (1.6, -15.55))
            ThreePointArc((1.6, -15.55), (1.5275208457, -15.0738906997), (1.3166499177, -14.6409163987))
            ThreePointArc((1.3166499177, -14.6409163987), (0, -14.7), (-1.3166499177, -14.6409163987))
            ThreePointArc((-1.3166499177, -14.6409163987), (-1.5729578086, -15.2570772585), (-1.5556276057, -15.9241961415))
            ThreePointArc((-1.5556276057, -15.9241961415), (-1.113638053, -15.9611970192), (-0.6707927224, -15.9859324759))
            ThreePointArc((-0.6707927224, -15.9859324759), (-0.2273387583, -14.7829816893), (0.8, -15.55))
            ThreePointArc((0.8, -15.55), (0.7670183107, -15.7773387583), (0.6707927224, -15.9859324759))
            ThreePointArc((0.6707927224, -15.9859324759), (1.113638053, -15.9611970192), (1.5556276057, -15.9241961415))
        make_face()
        with BuildLine():
            ThreePointArc((13.3377304948, -6.1802059227), (12.7305734356, -7.35), (12.0210805771, -8.460710476))
            ThreePointArc((12.0210805771, -8.460710476), (12.4265375891, -8.9907600505), (13.0129445905, -9.3093110961))
            ThreePointArc((13.0129445905, -9.3093110961), (13.265983067, -8.9450373542), (13.5088272661, -8.5738897762))
            ThreePointArc((13.5088272661, -8.5738897762), (12.7738747058, -7.375), (14.1796199885, -7.4120426996))
            ThreePointArc((14.1796199885, -7.4120426996), (14.37962112, -7.0161596651), (14.5685721962, -6.6148850454))
            ThreePointArc((14.5685721962, -6.6148850454), (13.9994953976, -6.2663172079), (13.3377304948, -6.1802059227))
        make_face()
        with BuildLine():
            ThreePointArc((-13.0129445905, -9.3093110961), (-12.4265375891, -8.9907600505), (-12.0210805771, -8.460710476))
            ThreePointArc((-12.0210805771, -8.460710476), (-12.7305734356, -7.35), (-13.3377304948, -6.1802059227))
            ThreePointArc((-13.3377304948, -6.1802059227), (-13.9994953976, -6.2663172079), (-14.5685721962, -6.6148850454))
            ThreePointArc((-14.5685721962, -6.6148850454), (-14.37962112, -7.0161596651), (-14.1796199885, -7.4120426996))
            ThreePointArc((-14.1796199885, -7.4120426996), (-13.2800670134, -6.9970732786), (-12.6666950288, -7.775))
            ThreePointArc((-12.6666950288, -7.775), (-12.9161070658, -8.3553902953), (-13.5088272661, -8.5738897762))
            ThreePointArc((-13.5088272661, -8.5738897762), (-13.265983067, -8.9450373542), (-13.0129445905, -9.3093110961))
        make_face()
        with BuildLine():
            ThreePointArc((-14.5685721962, 6.6148850454), (-13.9994953976, 6.2663172079), (-13.3377304948, 6.1802059227))
            ThreePointArc((-13.3377304948, 6.1802059227), (-12.7305734356, 7.35), (-12.0210805771, 8.460710476))
            ThreePointArc((-12.0210805771, 8.460710476), (-12.4265375891, 8.9907600505), (-13.0129445905, 9.3093110961))
            ThreePointArc((-13.0129445905, 9.3093110961), (-13.265983067, 8.9450373542), (-13.5088272661, 8.5738897762))
            ThreePointArc((-13.5088272661, 8.5738897762), (-12.9161070658, 8.3553902953), (-12.6666950288, 7.775))
            ThreePointArc((-12.6666950288, 7.775), (-13.2800670134, 6.9970732786), (-14.1796199885, 7.4120426996))
            ThreePointArc((-14.1796199885, 7.4120426996), (-14.37962112, 7.0161596651), (-14.5685721962, 6.6148850454))
        make_face()
        with BuildLine():
            ThreePointArc((13.3377304948, 6.1802059227), (13.9994953976, 6.2663172079), (14.5685721962, 6.6148850454))
            ThreePointArc((14.5685721962, 6.6148850454), (14.37962112, 7.0161596651), (14.1796199885, 7.4120426996))
            ThreePointArc((14.1796199885, 7.4120426996), (12.7738747058, 7.375), (13.5088272661, 8.5738897762))
            ThreePointArc((13.5088272661, 8.5738897762), (13.265983067, 8.9450373542), (13.0129445905, 9.3093110961))
            ThreePointArc((13.0129445905, 9.3093110961), (12.4265375891, 8.9907600505), (12.0210805771, 8.460710476))
            ThreePointArc((12.0210805771, 8.460710476), (12.7305734356, 7.35), (13.3377304948, 6.1802059227))
        make_face()
        with BuildLine():
            ThreePointArc((-1.5556276057, 15.9241961415), (-1.5729578086, 15.2570772585), (-1.3166499177, 14.6409163987))
            ThreePointArc((-1.3166499177, 14.6409163987), (0, 14.7), (1.3166499177, 14.6409163987))
            ThreePointArc((1.3166499177, 14.6409163987), (1.5275208457, 15.0738906997), (1.6, 15.55))
            ThreePointArc((1.6, 15.55), (1.5888681772, 15.7384089048), (1.5556276057, 15.9241961415))
            ThreePointArc((1.5556276057, 15.9241961415), (1.113638053, 15.9611970192), (0.6707927224, 15.9859324759))
            ThreePointArc((0.6707927224, 15.9859324759), (0.7670183107, 15.7773387583), (0.8, 15.55))
            ThreePointArc((0.8, 15.55), (-0.2273387583, 14.7829816893), (-0.6707927224, 15.9859324759))
            ThreePointArc((-0.6707927224, 15.9859324759), (-1.113638053, 15.9611970192), (-1.5556276057, 15.9241961415))
        make_face()
    extrude(amount=F6_DEPTH)


solid = f1.part
